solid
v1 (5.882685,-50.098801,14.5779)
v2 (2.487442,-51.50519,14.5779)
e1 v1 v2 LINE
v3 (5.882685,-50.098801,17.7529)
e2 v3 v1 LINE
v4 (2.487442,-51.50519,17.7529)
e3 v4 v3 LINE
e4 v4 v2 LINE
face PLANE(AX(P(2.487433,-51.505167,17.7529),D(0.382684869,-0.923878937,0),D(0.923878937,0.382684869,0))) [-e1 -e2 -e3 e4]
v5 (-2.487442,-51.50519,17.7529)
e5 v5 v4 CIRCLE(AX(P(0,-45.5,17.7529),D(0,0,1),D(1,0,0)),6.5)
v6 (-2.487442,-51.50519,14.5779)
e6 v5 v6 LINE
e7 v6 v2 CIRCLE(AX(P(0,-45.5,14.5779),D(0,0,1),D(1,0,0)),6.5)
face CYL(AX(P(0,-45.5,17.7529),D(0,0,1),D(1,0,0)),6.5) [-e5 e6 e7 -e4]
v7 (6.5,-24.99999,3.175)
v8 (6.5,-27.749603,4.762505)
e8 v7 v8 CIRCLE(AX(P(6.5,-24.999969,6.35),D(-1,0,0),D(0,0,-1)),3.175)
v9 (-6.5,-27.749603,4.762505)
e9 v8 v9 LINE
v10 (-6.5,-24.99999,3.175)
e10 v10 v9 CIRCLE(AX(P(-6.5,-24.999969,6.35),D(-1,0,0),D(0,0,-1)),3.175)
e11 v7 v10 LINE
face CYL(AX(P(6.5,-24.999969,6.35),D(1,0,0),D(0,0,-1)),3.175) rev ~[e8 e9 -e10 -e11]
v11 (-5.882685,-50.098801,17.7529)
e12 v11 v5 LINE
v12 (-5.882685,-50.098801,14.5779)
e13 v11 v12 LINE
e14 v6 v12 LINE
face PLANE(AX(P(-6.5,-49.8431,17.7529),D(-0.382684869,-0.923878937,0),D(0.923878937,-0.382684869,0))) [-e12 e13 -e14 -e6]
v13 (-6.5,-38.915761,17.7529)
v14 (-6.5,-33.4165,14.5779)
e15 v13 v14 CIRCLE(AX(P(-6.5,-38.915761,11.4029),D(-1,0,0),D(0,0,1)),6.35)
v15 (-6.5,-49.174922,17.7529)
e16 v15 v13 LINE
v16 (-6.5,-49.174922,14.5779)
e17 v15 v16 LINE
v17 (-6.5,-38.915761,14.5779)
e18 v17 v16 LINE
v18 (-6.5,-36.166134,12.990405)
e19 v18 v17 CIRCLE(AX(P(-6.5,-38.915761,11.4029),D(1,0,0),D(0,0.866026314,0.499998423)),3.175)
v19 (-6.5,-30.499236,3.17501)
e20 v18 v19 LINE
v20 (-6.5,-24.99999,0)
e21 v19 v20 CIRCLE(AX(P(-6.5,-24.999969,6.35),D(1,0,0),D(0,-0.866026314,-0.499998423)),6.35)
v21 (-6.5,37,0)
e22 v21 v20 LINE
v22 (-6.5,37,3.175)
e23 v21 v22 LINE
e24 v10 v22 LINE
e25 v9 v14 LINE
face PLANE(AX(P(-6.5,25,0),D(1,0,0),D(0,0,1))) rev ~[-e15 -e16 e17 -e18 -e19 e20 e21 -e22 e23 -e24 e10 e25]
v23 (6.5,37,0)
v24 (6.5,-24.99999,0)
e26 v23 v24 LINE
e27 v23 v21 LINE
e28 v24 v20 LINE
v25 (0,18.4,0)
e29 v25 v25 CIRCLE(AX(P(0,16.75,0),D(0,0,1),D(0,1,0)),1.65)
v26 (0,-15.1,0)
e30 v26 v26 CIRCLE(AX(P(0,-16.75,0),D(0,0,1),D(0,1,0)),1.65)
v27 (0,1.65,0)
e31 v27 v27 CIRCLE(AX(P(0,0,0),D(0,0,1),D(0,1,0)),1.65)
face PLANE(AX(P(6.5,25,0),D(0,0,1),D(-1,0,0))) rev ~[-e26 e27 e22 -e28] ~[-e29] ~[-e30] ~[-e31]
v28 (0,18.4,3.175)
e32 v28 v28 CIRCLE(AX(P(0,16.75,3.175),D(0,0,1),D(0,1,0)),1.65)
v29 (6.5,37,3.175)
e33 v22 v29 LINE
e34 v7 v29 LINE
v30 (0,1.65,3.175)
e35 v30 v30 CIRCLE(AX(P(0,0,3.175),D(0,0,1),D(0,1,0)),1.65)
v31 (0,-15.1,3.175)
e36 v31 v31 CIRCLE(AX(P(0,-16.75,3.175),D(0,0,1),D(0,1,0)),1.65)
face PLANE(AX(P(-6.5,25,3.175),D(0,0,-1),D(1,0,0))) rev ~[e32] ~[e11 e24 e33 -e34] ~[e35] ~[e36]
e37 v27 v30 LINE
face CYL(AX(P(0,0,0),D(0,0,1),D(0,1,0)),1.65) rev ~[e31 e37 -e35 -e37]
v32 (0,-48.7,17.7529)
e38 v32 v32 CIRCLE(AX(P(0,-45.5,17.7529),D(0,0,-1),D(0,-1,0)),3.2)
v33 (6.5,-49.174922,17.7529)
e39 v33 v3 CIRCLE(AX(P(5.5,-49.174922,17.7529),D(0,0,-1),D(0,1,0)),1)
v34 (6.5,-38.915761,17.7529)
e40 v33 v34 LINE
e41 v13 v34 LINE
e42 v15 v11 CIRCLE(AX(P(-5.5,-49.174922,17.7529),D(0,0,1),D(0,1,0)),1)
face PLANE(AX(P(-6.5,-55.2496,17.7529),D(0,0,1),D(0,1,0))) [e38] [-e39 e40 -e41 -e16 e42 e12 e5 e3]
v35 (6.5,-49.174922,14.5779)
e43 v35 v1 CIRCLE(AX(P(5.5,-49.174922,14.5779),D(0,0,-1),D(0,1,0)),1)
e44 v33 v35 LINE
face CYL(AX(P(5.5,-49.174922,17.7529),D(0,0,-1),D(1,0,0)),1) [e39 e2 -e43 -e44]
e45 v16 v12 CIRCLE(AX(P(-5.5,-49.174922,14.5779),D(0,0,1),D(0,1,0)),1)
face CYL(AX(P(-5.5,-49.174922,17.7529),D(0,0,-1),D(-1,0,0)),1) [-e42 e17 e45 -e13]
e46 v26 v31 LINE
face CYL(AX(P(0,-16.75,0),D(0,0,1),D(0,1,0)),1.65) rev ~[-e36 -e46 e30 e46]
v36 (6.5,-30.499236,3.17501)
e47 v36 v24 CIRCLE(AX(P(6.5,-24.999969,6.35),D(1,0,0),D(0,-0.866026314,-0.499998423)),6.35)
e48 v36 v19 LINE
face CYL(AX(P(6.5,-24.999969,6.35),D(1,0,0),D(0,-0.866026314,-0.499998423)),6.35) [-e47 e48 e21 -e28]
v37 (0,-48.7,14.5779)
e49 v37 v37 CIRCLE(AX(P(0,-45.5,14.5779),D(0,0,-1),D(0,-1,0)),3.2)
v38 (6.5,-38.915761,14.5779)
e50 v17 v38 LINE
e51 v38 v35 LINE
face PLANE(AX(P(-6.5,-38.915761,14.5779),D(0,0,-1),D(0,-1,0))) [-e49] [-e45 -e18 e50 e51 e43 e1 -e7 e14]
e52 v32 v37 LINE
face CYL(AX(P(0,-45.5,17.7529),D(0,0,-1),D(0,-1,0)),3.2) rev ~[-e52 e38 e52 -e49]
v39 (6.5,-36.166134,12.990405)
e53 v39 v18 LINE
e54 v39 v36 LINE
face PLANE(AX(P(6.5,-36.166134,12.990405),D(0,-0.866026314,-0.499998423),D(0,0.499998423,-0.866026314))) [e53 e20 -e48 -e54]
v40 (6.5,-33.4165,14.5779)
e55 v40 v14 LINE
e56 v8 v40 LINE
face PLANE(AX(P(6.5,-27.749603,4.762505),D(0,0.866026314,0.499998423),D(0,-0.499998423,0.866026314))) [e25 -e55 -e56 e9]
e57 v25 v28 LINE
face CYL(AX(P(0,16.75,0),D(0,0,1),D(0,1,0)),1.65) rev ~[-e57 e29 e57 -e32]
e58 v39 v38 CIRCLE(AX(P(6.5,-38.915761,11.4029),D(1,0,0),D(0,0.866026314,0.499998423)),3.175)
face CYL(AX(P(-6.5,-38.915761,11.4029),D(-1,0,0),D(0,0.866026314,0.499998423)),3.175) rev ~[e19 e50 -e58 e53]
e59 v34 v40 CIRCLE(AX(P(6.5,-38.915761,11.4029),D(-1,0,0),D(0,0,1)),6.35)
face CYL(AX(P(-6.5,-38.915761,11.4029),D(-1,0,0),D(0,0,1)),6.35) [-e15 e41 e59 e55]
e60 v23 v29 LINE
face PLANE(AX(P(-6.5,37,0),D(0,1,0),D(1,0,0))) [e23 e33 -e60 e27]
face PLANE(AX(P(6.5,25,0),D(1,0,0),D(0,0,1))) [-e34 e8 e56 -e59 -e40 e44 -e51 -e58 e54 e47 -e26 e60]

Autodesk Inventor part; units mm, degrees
ref_plane "YZ Plane" through (0, 0, 0) normal (1, 0, 0) x (0, 1, 0)
ref_plane "XZ Plane" through (0, 0, 0) normal (0, 1, 0) x (-1, 0, 0)
ref_plane "XY Plane" through (0, 0, 0) normal (0, 0, 1) x (1, 0, 0)
sketch "Sketch1" plane through (0, 0, 0) normal (0, 0, 1) x (1, 0, 0)
  line L0 (6.5, -25) -> (-6.5, -25)
  line L1 (-6.5, -25) -> (-6.5, 25)
  line L2 (-6.5, 25) -> (6.5, 25)
  line L3 (6.5, 25) -> (6.5, -25)
  line L4 (6.5, -25) -> (-6.5, 25) construction
  line L5 (-6.5, -25) -> (6.5, 25) construction
  line L6 (0, 16.75) -> (0, -16.75) construction
  point P0 (0, 0)
  dimension "d0" = 50
  dimension "d1" = 13
  dimension "d2" = 33.5
extrude "Plate1" add sketch "Sketch1" along normal blind 3.175
hole "Hole1" at (0, 0, 0) at (0, 16.75, 0) at (0, -16.75, 0) direction (0, 0, 1) diameter 3.3 end through all
sketch "Sketch2" plane through (6.5, -27.7496, 4.7625) normal (0, -0.8660254, -0.5) x (1, 0, 0)
  line L0 (-13, 0) -> (0, 0)
  line L1 (0, 0) -> (0, 11.3338)
  line L2 (0, 11.3338) -> (-13, 11.3338)
  line L3 (-13, 11.3338) -> (-13, 0)
edge flange "Flange1" height 15 angle 60 thickness 3.175 bend radius 3.175 thickness toward (0, -0.8660254, -0.5) relief tear relief width 3.175 relief depth 1.5875 edges at (0, -25, 3.175) wall of the first edge with corners at (-6.5, -27.7496, 4.7625) (6.5, -27.7496, 4.7625) (6.5, -33.4165, 14.5779) (-6.5, -33.4165, 14.5779)
bend "Bend1"
corner "Corner1"
sketch "Sketch3" plane through (-6.5, -38.9158, 14.5779) normal (0, 0, 1) x (1, 0, 0)
  line L0 (13, 0) -> (0, 0)
  line L1 (0, 0) -> (0, -16.3338)
  line L2 (0, -16.3338) -> (13, -16.3338)
  line L3 (13, -16.3338) -> (13, 0)
edge flange "Flange2" height 20 angle 60 thickness 3.175 bend radius 3.175 thickness toward (0, 0, 1) relief tear relief width 3.175 relief depth 1.5875 edges at (0, -36.1662, 12.9904) wall of the first edge with corners at (6.5, -38.9158, 14.5779) (-6.5, -38.9158, 14.5779) (-6.5, -55.2496, 14.5779) (6.5, -55.2496, 14.5779)
bend "Bend2"
corner "Corner2"
sketch "Sketch4" plane through (-6.5, 25, 0) normal (0, 1, 0) x (1, 0, 0)
  line L0 (0, -3.175) -> (13, -3.175) projected
  line L1 (13, 0) -> (13, -3.175) projected
  line L2 (13, 0) -> (0, 0) projected
  line L3 (0, 0) -> (0, -3.175) projected
  point P0 (6.5, 0)
extrude "Extrusion1" add sketch "Sketch4" along normal blind 12
sketch "Sketch5" plane through (-6.5, -55.2496, 17.7529) normal (0, 0, 1) x (1, 0, 0)
  circle A0 centre (6.5, 9.7496) radius 6.5
  line L0 (0, 0) -> (0, 16.3338) construction
  line L1 (0, 9.7496) -> (0, 5.4065)
  line L2 (0, 5.4065) -> (6.5, 2.7141)
  line L3 (6.5, 2.7141) -> (13, 5.4065)
  line L4 (13, 5.4065) -> (13, 9.7496)
  line L5 (13, 16.3338) -> (13, 0) construction
  line L6 (13, 16.3338) -> (0, 16.3338) projected
  line L7 (0, 0) -> (0, 16.3338) projected
  line L8 (13, 0) -> (0, 0) projected
  line L9 (13, 16.3338) -> (13, 0) projected
  point P0 (6.5, 55.2496)
  point P1 (13, 5.4065)
  point P2 (8.9874, 3.7444)
  point P3 (4.0126, 3.7444)
  point P4 (0, 5.4065)
  dimension "d33" = 45.5
  dimension "d34" = 135
extrude "Extrusion2" cut sketch "Sketch5" against normal through all contours L3 L2 A0 | L3 L9 L8 L7 L2
fillet "Fillet1" radius 1 2 edges at (-6.5, -49.8432, 16.1654) (6.5, -49.8432, 16.1654)
sketch "Sketch6" plane through (-6.5, -38.9158, 17.7529) normal (0, 0, 1) x (1, 0, 0)
  arc A0 (4.0126, -12.5894) -> (8.9874, -12.5894) centre (6.5, -6.5842) ccw projected
  point P0 (6.5, 38.9158)
hole "Hole2" at (0, -45.5, 17.7529) direction (0, 0, -1) diameter 6.4 end through all
equation "\"d9\" = Thickness"
equation "\"d43\" = Thickness"
equation "\"d3\" = Thickness"
equation "\"d11\" = BendReliefWidth"
equation "\"d12\" = BendReliefDepth"
equation "\"d13\" = MinimumRemnant"
equation "\"d14\" = TransitionRadius"
equation "\"d17\" = BendRadius"
equation "\"d18\" = CornerReliefSize"
equation "\"d19\" = GapSize"
equation "\"d20\" = JacobiRadiusSize"
equation "\"d21\" = BendReliefWidth"
equation "\"d22\" = BendReliefDepth"
equation "\"d23\" = MinimumRemnant"
equation "\"d24\" = TransitionRadius"
equation "\"d27\" = BendRadius"
equation "\"d28\" = CornerReliefSize"
equation "\"d29\" = GapSize"
equation "\"d30\" = JacobiRadiusSize"
equation "\"BendReliefWidth\" = Thickness"
equation "\"BendReliefDepth\" = 0.5 * Thickness"
equation "\"CornerReliefSize\" = 4 * Thickness"
equation "\"MinimumRemnant\" = 2 * Thickness"
equation "\"TransitionRadius\" = BendRadius"
equation "\"JacobiRadiusSize\" = BendRadius"
equation "\"GapSize\" = Thickness"
equation "\"Thickness\" = 3.175"
equation "\"BendRadius\" = 3.175"
properties part number "Printhead Endstop Cable Guide Plate" material "Aluminum 6061"
